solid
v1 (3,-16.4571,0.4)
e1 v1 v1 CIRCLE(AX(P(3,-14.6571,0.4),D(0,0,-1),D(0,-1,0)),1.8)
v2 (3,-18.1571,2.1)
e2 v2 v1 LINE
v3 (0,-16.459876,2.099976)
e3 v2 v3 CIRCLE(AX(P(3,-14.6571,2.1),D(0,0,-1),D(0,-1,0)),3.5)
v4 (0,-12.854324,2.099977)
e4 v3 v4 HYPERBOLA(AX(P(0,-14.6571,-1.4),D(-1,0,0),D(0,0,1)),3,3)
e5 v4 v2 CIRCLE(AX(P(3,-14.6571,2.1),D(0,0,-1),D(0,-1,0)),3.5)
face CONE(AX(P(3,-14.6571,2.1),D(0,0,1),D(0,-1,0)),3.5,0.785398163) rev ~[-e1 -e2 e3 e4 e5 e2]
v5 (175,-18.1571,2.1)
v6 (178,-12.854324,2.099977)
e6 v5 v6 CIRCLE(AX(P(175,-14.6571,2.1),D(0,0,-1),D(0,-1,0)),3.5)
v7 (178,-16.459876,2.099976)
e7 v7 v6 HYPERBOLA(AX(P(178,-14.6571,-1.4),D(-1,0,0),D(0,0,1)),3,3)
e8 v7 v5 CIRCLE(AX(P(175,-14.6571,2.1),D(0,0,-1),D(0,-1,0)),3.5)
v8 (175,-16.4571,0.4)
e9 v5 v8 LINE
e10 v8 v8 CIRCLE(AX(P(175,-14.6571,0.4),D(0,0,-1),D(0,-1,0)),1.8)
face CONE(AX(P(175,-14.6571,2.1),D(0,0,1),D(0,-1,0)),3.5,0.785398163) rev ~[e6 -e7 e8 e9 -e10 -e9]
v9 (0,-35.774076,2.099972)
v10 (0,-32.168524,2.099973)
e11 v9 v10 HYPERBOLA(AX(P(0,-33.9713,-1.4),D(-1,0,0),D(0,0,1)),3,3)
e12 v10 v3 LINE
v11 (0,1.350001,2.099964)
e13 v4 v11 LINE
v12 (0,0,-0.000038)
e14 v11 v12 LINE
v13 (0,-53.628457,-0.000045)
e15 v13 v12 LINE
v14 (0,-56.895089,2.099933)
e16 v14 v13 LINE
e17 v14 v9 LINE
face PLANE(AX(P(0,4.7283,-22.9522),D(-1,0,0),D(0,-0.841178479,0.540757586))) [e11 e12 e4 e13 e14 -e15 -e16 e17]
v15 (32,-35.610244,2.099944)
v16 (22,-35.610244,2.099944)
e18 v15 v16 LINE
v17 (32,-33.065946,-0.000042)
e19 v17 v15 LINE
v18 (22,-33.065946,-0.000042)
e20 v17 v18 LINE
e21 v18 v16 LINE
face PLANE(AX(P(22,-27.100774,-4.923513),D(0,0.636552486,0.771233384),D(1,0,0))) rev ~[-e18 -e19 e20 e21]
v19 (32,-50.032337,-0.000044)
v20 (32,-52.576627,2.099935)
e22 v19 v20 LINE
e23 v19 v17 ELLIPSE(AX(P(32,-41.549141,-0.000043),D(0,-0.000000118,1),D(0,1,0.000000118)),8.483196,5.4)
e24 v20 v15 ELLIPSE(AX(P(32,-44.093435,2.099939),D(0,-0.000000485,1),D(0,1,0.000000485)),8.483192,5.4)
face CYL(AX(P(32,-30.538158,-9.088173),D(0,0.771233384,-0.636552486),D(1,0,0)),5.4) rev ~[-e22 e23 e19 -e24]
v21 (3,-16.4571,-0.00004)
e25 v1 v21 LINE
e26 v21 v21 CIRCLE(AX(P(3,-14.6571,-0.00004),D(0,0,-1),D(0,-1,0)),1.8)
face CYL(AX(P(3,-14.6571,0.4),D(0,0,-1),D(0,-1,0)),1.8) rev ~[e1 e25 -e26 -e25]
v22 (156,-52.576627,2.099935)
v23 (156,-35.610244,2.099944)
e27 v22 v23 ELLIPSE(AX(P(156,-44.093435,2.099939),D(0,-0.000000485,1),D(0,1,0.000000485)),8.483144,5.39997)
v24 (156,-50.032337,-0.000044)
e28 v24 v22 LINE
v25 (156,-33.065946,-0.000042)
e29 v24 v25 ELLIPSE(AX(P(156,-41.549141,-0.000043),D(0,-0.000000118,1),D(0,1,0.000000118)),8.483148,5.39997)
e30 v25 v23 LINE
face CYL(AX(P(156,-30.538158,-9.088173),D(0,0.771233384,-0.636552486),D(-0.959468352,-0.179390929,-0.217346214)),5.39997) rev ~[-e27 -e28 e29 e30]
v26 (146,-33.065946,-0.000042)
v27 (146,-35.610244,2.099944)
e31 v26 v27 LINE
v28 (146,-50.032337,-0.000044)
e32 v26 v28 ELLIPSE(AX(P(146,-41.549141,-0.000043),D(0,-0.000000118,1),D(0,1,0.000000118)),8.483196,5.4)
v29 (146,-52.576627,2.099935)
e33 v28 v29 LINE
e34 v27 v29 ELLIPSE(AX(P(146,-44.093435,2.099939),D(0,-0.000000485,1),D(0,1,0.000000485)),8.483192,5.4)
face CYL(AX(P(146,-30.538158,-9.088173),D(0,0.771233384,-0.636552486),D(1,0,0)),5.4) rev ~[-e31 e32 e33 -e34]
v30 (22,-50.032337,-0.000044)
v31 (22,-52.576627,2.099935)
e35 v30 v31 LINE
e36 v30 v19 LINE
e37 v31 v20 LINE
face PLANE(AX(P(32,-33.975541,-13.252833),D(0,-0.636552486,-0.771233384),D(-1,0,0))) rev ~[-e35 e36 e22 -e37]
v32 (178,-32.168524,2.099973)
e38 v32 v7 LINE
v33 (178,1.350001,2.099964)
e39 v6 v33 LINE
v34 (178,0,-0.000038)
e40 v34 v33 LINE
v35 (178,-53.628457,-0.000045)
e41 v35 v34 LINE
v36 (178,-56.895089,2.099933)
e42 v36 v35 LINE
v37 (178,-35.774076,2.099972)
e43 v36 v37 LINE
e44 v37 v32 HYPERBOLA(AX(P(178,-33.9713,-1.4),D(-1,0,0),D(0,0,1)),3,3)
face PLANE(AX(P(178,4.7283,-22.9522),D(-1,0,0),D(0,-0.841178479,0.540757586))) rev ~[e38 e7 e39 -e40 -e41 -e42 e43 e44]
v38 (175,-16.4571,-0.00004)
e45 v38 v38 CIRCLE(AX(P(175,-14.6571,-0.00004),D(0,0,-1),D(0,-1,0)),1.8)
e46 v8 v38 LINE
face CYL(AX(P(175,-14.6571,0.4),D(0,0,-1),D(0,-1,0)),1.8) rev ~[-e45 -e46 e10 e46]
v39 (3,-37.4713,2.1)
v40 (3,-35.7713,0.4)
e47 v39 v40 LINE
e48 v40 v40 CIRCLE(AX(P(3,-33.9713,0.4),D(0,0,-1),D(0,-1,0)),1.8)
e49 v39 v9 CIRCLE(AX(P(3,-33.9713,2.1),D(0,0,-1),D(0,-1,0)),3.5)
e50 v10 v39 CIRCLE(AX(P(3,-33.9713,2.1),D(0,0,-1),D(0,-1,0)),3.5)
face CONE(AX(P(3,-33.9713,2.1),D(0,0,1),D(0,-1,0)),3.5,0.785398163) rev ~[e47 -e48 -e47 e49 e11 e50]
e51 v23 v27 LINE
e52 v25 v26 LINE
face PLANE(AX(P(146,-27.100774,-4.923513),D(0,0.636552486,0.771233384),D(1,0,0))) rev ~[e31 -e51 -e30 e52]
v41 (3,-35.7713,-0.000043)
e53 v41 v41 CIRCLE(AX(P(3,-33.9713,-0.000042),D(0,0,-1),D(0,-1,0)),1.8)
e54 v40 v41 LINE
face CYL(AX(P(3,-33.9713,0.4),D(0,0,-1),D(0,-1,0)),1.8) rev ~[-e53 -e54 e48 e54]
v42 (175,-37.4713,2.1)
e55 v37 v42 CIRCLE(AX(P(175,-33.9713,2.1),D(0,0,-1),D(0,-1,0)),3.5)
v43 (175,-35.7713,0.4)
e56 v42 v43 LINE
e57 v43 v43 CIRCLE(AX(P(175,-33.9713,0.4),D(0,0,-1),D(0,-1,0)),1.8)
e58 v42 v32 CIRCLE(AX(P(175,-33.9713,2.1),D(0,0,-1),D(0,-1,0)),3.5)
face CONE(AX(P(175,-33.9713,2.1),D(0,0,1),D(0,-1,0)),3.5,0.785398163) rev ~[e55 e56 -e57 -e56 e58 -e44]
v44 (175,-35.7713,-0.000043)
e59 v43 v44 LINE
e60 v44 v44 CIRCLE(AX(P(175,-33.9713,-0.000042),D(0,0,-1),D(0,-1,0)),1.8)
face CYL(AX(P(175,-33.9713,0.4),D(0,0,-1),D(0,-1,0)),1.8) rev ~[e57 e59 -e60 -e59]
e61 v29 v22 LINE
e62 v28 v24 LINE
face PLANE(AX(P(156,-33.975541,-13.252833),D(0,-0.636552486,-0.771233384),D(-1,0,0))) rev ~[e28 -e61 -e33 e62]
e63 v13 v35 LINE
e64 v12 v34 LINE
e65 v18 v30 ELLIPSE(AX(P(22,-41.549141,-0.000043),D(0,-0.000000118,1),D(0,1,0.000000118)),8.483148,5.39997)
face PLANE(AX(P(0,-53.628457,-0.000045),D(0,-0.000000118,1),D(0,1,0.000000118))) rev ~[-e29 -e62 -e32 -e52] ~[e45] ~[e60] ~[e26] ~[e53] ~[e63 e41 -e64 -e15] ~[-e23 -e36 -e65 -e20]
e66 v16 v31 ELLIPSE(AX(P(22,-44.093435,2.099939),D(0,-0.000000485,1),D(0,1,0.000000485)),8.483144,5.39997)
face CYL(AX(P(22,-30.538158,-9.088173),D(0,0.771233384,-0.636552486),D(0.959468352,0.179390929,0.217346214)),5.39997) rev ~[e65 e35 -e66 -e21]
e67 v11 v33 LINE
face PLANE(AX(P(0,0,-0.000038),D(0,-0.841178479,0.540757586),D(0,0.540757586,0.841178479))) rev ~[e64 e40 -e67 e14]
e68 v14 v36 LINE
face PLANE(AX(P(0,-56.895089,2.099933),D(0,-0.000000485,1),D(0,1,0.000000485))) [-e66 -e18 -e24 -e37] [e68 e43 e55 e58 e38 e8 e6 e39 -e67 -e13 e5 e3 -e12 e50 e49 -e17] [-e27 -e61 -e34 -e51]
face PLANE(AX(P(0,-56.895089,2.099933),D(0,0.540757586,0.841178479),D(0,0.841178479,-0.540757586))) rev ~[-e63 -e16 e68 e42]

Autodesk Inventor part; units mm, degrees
ref_plane "YZ Plane" through (0, 0, 0) normal (1, 0, 0) x (0, 1, 0)
ref_plane "XZ Plane" through (0, 0, 0) normal (0, 1, 0) x (-1, 0, 0)
ref_plane "Work Plane1" through (0, 4.7283, -22.9522) normal (-1, 0, 0) x (0, -0.8411785, 0.5407576)
sketch "Sketch1" plane through (0, 4.7283, -22.9522) normal (-1, 0, 0) x (0, -0.8411785, 0.5407576)
  line L0 (-61.5, -16.75) -> (61.5, -16.75) projected
  line L1 (61.5, -16.75) -> (61.5, -12.25) projected
  line L2 (61.5, -12.25) -> (16.3889, 16.75) projected
  line L3 (16.3889, 16.75) -> (-61.5, 16.75) projected
  line L4 (-61.5, 16.75) -> (-61.5, -16.75) projected
  line L5 (61.5, -12.25) -> (61.5, -16.75) projected
  line L6 (61.5, -16.75) -> (65.5, -16.75) projected
  line L7 (65.5, -16.75) -> (65.5, -20.25) projected
  line L8 (65.5, -20.25) -> (79.5, -20.25) projected
  line L9 (79.5, -20.25) -> (65.5, -11.25) projected
  line L10 (65.5, -11.25) -> (65.5, -12.25) projected
  line L11 (65.5, -12.25) -> (61.5, -12.25) projected
  line L12 (16.3889, 16.75) -> (16.3889, 18.75) projected
  line L13 (14.3494, 18.75) -> (16.3889, 18.75) projected
  line L14 (65.3834, -12.25) -> (12.6747, 21.6342)
  line L15 (16.3889, 16.75) -> (16.3889, 19.2465)
  dimension "d13" = 2.1
ref_plane "Work Plane2" through (178, -56.0619, -70.2985) normal (1, 0, 0) x (0, 0.8411785, -0.5407576)
extrude "Extrusion1" add sketch "Sketch1" against normal up to surface (178 mm away) contours L2 L12 L15 L14 L11
sketch "Sketch2" plane through (0, -56.8951, 2.1) normal (0, 0, 1) x (1, 0, 0)
  circle A0 centre (3, 22.9238) radius 2.5 projected
  circle A1 centre (3, 42.238) radius 2.5 projected
  line L0 (0, 3.2667) -> (0, 56.8951) projected
  line L1 (0, 3.2667) -> (6, 3.2667) projected
  line L2 (6, 56.8951) -> (6, 3.2667) projected
  line L3 (0, 56.8951) -> (6, 56.8951) projected
  circle A2 centre (175, 22.9238) radius 2.5 projected
  circle A3 centre (175, 42.238) radius 2.5 projected
  line L4 (178, 3.2667) -> (178, 56.8951) projected
  line L5 (178, 56.8951) -> (172, 56.8951) projected
  line L6 (172, 56.8951) -> (172, 3.2667) projected
  line L7 (178, 3.2667) -> (172, 3.2667) projected
hole "Hole1" at (3, -14.6571, 2.1) at (3, -33.9713, 2.1) at (175, -33.9713, 2.1) at (175, -14.6571, 2.1) direction (0, 0, -1) diameter 3.6 end through all countersink diameter 7 countersink angle 90 clearance for "Countersunk Flat Head Screw ISO 2009/7046" size "M3" standard "ISO"
ref_plane "Work Plane3" through (22, -30.5397, -9.0869) normal (0, -0.7712334, 0.6365525) x (1, 0, 0)
sketch "Sketch3" plane through (22, -30.5397, -9.0869) normal (0, -0.7712334, 0.6365525) x (1, 0, 0)
  line L0 (-9.9215, 5.4518) -> (-9.9215, -5.4534)
  spline S0 degree 3 poles (-9.9215, -5.4534) (-9.9222, -5.5772) (-9.8204, -5.8209) (-9.5772, -5.9222) (-9.4534, -5.9215) knots 0 0 0 0 0.5 1 1 1 1
  line L1 (-9.4534, -5.9215) -> (19.4534, -5.9215)
  spline S1 degree 3 poles (19.4534, -5.9215) (19.5775, -5.9222) (19.8219, -5.82) (19.9222, -5.5758) (19.9215, -5.4518) knots 0 0 0 0 0.5 1 1 1 1
  line L2 (19.9215, -5.4518) -> (19.9215, 5.4534)
  spline S2 degree 3 poles (19.9215, 5.4534) (19.9222, 5.5775) (19.82, 5.8219) (19.5758, 5.9222) (19.4518, 5.9215) knots 0 0 0 0 0.5 1 1 1 1
  line L3 (19.4518, 5.9215) -> (-9.4534, 5.9215)
  spline S3 degree 3 poles (-9.4534, 5.9215) (-9.5775, 5.9222) (-9.8219, 5.82) (-9.9222, 5.5758) (-9.9215, 5.4518) knots 0 0 0 0 0.5 1 1 1 1
  circle A0 centre (-8.3791, -4.3791) radius 0.5
  circle A1 centre (-8.3791, 4.3791) radius 0.5
  circle A2 centre (18.3791, 4.3791) radius 0.5
  circle A3 centre (18.3791, -4.3791) radius 0.5
  arc A4 (5.2617, -1.4512) -> (5.1811, -1.5218) centre (5.2771, -1.55) ccw
  arc A5 (5.1811, 1.5218) -> (5.1811, -1.5218) centre (0, 0) ccw
  arc A6 (5.1811, 1.5218) -> (5.2617, 1.4512) centre (5.2771, 1.55) ccw
  arc A7 (5.2617, 1.4512) -> (5.3414, 1.519) centre (5.2463, 1.55) ccw
  arc A8 (5.3414, -1.519) -> (5.3414, 1.519) centre (10, 0) ccw
  arc A9 (5.3414, -1.519) -> (5.2617, -1.4512) centre (5.2463, -1.55) ccw
  line L4 (143.9215, 5.4518) -> (143.9215, -5.4534)
  spline S4 degree 3 poles (143.4534, 5.9215) (143.5775, 5.9222) (143.8219, 5.82) (143.9222, 5.5758) (143.9215, 5.4518) knots 0 0 0 0 0.5 1 1 1 1
  line L5 (114.5482, 5.9215) -> (143.4534, 5.9215)
  spline S5 degree 3 poles (114.0785, 5.4534) (114.0778, 5.5775) (114.18, 5.8219) (114.4242, 5.9222) (114.5482, 5.9215) knots 0 0 0 0 0.5 1 1 1 1
  line L6 (114.0785, -5.4518) -> (114.0785, 5.4534)
  spline S6 degree 3 poles (114.5466, -5.9215) (114.4225, -5.9222) (114.1781, -5.82) (114.0778, -5.5758) (114.0785, -5.4518) knots 0 0 0 0 0.5 1 1 1 1
  line L7 (143.4534, -5.9215) -> (114.5466, -5.9215)
  spline S7 degree 3 poles (143.9215, -5.4534) (143.9222, -5.5772) (143.8204, -5.8209) (143.5772, -5.9222) (143.4534, -5.9215) knots 0 0 0 0 0.5 1 1 1 1
  circle A10 centre (142.3791, -4.3791) radius 0.5
  circle A11 centre (142.3791, 4.3791) radius 0.5
  circle A12 centre (115.6209, 4.3791) radius 0.5
  circle A13 centre (115.6209, -4.3791) radius 0.5
  arc A14 (128.8189, -1.5218) -> (128.7383, -1.4512) centre (128.7229, -1.55) ccw
  arc A15 (128.7383, -1.4512) -> (128.6586, -1.519) centre (128.7537, -1.55) ccw
  arc A16 (128.6586, 1.519) -> (128.6586, -1.519) centre (124, 0) ccw
  arc A17 (128.6586, 1.519) -> (128.7383, 1.4512) centre (128.7537, 1.55) ccw
  arc A18 (128.7383, 1.4512) -> (128.8189, 1.5218) centre (128.7229, 1.55) ccw
  arc A19 (128.8189, -1.5218) -> (128.8189, 1.5218) centre (134, 0) ccw
  circle A20 centre (10, 0) radius 5.4
  circle A21 centre (124, 0) radius 5.4
  line L8 (0, 5.4) -> (10, 5.4)
  line L9 (10, -5.4) -> (0, -5.4)
  line L10 (124, 5.4) -> (134, 5.4)
  line L11 (134, -5.4) -> (124, -5.4)
  point P0 (-22, 26.4483)
  dimension "d9" = 10.8
  dimension "d10" = 10.8
extrude "Extrusion2" cut sketch "Sketch3" along normal blind 78.25 contours A9 A8 A7 A6 A5 A20 A4 | A4 A5 A20 A6 A7 A8 A9 | A20 L9 A5 | A5 A20 | A5 L8 A20 | A19 A21 A18 A17 A16 A15 A14 | A14 A15 A16 A17 A18 A19 A21 | A21 A19 | A19 L11 A21 | A19 A21 L10
properties part number "front"
